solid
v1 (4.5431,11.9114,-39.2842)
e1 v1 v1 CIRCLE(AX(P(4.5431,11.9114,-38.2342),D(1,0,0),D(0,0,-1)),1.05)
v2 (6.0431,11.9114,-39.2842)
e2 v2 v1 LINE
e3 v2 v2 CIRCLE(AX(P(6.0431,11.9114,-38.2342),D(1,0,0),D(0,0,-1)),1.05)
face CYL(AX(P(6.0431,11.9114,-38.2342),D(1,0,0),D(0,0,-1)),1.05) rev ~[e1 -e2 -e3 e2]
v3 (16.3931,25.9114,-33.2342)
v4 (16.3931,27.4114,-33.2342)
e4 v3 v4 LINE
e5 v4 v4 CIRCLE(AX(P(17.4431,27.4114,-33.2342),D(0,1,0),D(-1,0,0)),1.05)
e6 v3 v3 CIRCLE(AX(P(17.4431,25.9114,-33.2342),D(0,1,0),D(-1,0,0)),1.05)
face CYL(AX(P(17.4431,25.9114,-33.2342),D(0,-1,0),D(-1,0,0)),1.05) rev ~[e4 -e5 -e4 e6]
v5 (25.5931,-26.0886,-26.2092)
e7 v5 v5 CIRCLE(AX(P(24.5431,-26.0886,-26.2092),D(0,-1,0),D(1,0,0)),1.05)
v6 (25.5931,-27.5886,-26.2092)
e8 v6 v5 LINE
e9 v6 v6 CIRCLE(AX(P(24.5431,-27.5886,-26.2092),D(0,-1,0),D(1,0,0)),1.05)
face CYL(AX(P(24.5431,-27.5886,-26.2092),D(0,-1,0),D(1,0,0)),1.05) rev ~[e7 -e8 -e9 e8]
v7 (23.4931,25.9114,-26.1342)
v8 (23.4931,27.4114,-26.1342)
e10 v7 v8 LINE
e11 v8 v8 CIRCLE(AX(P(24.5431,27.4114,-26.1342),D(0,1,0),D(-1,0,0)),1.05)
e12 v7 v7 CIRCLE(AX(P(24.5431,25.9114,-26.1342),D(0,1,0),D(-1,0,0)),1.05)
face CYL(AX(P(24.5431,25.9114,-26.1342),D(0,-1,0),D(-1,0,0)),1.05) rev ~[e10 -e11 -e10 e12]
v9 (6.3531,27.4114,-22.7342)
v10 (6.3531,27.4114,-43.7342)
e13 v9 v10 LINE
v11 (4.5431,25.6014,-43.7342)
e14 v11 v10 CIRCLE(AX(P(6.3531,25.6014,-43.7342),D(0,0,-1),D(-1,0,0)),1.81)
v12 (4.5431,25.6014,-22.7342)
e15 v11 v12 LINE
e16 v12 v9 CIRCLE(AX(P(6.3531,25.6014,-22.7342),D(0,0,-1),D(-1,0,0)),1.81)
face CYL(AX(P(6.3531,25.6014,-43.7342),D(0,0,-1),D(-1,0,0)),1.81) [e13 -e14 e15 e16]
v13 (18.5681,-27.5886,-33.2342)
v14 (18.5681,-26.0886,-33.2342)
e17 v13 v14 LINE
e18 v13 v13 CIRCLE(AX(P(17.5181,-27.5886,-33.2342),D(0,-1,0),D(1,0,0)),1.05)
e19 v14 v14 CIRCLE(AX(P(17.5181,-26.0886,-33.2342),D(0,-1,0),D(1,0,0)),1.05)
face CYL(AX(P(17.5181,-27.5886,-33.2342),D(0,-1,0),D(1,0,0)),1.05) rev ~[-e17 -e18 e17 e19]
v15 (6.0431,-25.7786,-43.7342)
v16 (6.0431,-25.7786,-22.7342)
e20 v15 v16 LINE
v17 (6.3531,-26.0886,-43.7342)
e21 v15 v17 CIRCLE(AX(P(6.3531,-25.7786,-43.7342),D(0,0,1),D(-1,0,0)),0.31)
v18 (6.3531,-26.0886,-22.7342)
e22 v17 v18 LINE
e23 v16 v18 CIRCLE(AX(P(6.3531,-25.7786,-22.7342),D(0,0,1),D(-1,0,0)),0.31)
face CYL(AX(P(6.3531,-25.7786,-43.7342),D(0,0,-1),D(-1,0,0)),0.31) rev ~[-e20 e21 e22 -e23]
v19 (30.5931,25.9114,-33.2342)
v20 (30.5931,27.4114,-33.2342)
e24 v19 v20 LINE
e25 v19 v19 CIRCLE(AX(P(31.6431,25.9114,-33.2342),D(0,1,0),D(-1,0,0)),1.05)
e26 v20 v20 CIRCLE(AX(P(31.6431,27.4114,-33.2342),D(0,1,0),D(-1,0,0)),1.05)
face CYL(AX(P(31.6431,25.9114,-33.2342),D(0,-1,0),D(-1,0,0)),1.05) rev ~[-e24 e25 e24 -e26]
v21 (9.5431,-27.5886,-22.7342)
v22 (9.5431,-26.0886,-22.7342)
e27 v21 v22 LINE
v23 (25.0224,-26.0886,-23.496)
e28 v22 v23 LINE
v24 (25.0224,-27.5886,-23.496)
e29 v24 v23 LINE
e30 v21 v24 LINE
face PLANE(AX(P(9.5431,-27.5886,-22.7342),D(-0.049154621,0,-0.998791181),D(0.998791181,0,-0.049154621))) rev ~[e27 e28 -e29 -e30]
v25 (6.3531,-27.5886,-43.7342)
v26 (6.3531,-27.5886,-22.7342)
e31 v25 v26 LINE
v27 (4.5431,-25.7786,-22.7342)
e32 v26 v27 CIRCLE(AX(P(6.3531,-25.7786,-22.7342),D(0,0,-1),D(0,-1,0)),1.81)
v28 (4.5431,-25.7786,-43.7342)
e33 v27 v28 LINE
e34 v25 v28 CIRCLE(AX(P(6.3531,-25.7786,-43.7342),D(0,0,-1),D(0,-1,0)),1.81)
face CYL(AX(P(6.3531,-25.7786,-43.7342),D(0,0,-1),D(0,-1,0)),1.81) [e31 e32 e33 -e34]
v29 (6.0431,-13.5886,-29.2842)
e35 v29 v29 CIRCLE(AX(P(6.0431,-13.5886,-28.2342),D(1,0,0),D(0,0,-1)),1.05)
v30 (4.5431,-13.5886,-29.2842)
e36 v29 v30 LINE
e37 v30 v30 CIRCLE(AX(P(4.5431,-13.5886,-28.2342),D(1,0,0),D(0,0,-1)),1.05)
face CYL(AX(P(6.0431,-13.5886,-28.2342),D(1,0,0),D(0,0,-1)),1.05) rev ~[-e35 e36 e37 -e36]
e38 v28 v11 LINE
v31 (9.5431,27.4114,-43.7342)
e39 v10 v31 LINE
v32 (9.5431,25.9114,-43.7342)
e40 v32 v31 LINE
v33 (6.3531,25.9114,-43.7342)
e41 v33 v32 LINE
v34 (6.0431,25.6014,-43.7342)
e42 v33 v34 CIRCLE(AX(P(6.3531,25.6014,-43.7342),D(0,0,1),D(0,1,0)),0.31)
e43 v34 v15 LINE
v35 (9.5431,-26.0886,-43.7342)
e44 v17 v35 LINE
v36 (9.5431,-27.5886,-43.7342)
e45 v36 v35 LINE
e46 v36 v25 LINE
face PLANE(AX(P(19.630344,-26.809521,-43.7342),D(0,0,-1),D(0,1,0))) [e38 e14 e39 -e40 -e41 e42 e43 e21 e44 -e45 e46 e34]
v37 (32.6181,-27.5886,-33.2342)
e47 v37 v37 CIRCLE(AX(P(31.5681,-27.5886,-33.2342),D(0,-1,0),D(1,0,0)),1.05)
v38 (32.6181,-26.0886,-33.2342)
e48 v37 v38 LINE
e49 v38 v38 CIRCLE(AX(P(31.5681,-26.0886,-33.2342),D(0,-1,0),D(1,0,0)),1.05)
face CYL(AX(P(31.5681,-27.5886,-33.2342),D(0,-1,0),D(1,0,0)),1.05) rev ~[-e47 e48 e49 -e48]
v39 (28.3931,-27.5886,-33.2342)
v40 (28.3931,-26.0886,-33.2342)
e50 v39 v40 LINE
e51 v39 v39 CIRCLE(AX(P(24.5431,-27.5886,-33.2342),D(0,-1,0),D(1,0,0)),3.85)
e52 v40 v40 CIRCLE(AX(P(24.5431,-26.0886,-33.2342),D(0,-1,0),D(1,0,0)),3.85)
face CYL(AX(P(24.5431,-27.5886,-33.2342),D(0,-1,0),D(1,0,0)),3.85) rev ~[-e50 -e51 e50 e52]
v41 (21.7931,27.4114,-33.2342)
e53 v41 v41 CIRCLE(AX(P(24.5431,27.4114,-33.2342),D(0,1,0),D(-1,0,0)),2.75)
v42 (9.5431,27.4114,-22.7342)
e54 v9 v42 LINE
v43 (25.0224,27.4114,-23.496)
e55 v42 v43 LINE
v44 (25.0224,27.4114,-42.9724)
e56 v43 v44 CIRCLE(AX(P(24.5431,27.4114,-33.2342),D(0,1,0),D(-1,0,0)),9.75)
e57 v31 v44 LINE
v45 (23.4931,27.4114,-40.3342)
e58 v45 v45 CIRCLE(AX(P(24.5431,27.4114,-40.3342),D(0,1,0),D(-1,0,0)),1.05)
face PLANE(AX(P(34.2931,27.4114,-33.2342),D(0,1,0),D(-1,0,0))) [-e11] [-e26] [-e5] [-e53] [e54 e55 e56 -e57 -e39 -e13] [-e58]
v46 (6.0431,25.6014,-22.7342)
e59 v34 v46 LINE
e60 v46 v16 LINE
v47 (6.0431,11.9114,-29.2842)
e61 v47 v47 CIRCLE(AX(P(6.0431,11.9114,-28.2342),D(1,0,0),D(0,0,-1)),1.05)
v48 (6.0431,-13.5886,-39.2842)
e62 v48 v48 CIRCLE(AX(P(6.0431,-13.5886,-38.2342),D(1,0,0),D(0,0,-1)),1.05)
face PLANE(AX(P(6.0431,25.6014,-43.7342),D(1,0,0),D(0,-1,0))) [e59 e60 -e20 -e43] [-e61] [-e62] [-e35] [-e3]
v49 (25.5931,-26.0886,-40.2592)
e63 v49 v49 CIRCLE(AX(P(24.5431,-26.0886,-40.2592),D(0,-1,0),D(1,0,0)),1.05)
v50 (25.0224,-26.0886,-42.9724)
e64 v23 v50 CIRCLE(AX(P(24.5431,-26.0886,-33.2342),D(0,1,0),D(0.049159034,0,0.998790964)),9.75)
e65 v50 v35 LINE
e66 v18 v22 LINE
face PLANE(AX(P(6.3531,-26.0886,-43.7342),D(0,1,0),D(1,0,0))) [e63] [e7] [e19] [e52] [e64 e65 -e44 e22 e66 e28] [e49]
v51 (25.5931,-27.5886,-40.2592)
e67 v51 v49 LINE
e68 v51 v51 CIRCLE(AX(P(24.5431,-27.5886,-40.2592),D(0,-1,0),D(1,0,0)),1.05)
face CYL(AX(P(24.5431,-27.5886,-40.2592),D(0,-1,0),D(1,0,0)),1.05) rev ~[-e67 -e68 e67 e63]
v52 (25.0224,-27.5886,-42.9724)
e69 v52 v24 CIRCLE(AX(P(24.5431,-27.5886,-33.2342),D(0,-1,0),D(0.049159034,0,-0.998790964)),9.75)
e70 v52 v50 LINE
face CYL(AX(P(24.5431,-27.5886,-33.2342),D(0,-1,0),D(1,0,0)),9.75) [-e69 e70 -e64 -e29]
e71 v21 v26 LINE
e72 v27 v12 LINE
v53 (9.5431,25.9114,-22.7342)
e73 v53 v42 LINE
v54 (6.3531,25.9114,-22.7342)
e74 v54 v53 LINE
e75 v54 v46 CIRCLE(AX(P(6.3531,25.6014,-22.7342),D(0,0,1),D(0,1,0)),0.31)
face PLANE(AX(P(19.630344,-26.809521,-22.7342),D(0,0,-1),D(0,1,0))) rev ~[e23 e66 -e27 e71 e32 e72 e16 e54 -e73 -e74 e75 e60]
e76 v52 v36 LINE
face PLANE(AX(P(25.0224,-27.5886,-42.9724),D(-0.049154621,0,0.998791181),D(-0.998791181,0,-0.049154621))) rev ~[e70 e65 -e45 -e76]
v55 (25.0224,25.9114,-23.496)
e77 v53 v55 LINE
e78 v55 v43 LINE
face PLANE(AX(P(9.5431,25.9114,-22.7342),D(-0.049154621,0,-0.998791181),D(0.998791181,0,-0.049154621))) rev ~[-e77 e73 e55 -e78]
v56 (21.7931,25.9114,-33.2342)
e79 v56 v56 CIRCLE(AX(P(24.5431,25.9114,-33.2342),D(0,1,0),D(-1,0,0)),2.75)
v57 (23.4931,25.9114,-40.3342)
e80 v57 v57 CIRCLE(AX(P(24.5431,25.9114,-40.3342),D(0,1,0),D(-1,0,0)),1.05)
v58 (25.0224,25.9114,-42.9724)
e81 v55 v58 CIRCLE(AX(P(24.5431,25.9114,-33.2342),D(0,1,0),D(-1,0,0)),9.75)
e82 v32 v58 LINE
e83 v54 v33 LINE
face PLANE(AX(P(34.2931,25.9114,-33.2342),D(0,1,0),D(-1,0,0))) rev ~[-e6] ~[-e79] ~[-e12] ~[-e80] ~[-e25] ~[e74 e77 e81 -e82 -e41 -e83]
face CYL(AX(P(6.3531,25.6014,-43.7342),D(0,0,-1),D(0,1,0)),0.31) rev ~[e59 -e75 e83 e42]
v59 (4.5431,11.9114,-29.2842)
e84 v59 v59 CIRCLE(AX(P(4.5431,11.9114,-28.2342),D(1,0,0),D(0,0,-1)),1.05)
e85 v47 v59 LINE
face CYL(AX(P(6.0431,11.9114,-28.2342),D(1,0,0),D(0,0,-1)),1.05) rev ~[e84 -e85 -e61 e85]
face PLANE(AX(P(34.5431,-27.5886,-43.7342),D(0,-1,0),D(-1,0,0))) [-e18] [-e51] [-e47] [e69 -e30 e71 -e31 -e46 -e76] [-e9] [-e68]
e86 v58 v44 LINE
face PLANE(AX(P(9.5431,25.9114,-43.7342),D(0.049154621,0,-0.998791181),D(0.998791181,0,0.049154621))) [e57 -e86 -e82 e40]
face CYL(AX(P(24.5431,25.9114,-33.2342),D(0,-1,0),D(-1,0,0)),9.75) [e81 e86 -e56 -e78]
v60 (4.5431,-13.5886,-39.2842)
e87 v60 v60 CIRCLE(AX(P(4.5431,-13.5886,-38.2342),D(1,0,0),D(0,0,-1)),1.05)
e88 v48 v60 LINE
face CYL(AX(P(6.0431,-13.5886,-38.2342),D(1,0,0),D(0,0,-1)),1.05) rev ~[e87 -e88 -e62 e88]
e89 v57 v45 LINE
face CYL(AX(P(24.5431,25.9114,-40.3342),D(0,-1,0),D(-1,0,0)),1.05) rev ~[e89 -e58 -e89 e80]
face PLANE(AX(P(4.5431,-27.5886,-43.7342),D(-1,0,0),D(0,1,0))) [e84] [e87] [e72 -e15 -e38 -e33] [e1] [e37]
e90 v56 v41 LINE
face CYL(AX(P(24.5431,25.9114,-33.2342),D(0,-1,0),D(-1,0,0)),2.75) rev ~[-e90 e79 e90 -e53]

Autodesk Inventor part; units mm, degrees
ref_plane "YZ Plane" through (0, 0, 0) normal (1, 0, 0) x (0, 1, 0)
ref_plane "Work Plane1" through (34.2931, 25.9114, -33.2342) normal (0, 1, 0) x (-1, 0, 0)
sketch "Sketch2" plane through (34.2931, 25.9114, -33.2342) normal (0, 1, 0) x (-1, 0, 0)
  circle A0 centre (9.75, 7.1) radius 0.7835
  circle A1 centre (16.85, 0) radius 0.7835
  circle A2 centre (9.75, -7.1) radius 0.7835
  circle A3 centre (2.65, 0) radius 0.7835
  circle A4 centre (4.7295, -5.0205) radius 0.7835
  circle A5 centre (14.7705, -5.0205) radius 0.7835
  circle A6 centre (14.7705, 5.0205) radius 0.7835
  circle A7 centre (4.7295, 5.0205) radius 0.7835
  circle A8 centre (9.75, 0) radius 3.8
  circle A9 centre (9.75, 0) radius 9.75
  circle A10 centre (9.75, 0) radius 2.75
  line L0 (29.75, -10.5) -> (29.75, 10.5)
  line L1 (29.75, -10.5) -> (24.75, -10.5)
  line L2 (29.75, 10.5) -> (24.75, 10.5)
  line L3 (24.75, -10.5) -> (9.2707, -9.7382)
  line L4 (24.75, 10.5) -> (9.2707, 9.7382)
  circle A11 centre (9.75, -7.1) radius 1.05
  circle A12 centre (16.85, 0) radius 1.05
  circle A13 centre (9.75, 7.1) radius 1.05
  circle A14 centre (2.65, 0) radius 1.05
  point P0 (34.2931, 33.2342)
  point P1 (29.75, 0)
  dimension "d2" = 5.5
  dimension "d4" = 21
  dimension "d5" = 5
  dimension "d6" = 20
  dimension "d36" = 2.1
extrude "Plate2" add sketch "Sketch2" along normal blind 1.5 contours A4 | A5 | A6 | A7 | A8 | A9 | A9 L4 L2 L0 L1 L3
sketch "Sketch3" plane through (6.0431, 27.4114, -43.7342) normal (-1, 0, 0) x (0, -1, 0)
  line L0 (0, 21) -> (0, 0)
  line L1 (0, 0) -> (55, 0)
  line L2 (55, 0) -> (55, 21)
  line L3 (55, 21) -> (0, 21)
edge flange "Flange1" height 55 angle 90 thickness 1.5 bend radius 0.31 thickness toward (-1, 0, 0) relief tear relief width 1.5 relief depth 0.75 edges at (4.5431, 25.9114, -33.2342) wall of the first edge with corners at (6.0431, 27.4114, -22.7342) (6.0431, 27.4114, -43.7342) (6.0431, -27.5886, -43.7342) (6.0431, -27.5886, -22.7342)
bend "Bend1"
corner "Corner1"
sketch "Sketch4" plane through (4.5431, -26.0886, -43.7342) normal (0, -1, 0) x (1, 0, 0)
  line L0 (0, 21) -> (0, 0)
  line L1 (0, 0) -> (30, 0)
  line L2 (30, 0) -> (30, 21)
  line L3 (30, 21) -> (0, 21)
edge flange "Flange2" height 30 angle 90 thickness 1.5 bend radius 0.31 thickness toward (0, -1, 0) relief tear relief width 1.5 relief depth 0.75 edges at (6.0431, -27.5886, -33.2342) wall of the first edge with corners at (4.5431, -26.0886, -22.7342) (4.5431, -26.0886, -43.7342) (34.5431, -26.0886, -43.7342) (34.5431, -26.0886, -22.7342)
bend "Bend2"
corner "Corner2"
sketch "Sketch5" plane through (34.5431, -27.5886, -43.7342) normal (0, -1, 0) x (1, 0, 0)
  circle A0 centre (-10, 10.5) radius 3.8 projected
  circle A1 centre (-10, 10.5) radius 3.85
  point P0 (-34.5431, 43.7342)
  dimension "d37" = 7.7
extrude "Cut1" cut sketch "Sketch5" against normal blind 1.5 contours A0 | A1
sketch "Sketch6" plane through (34.5431, -27.5886, -43.7342) normal (0, -1, 0) x (1, 0, 0)
  circle A0 centre (-10, 17.525) radius 0.7835 projected
  circle A1 centre (-2.975, 10.5) radius 0.7835 projected
  circle A2 centre (-10, 3.475) radius 0.7835 projected
  circle A3 centre (-17.025, 10.5) radius 0.7835 projected
  circle A4 centre (-10, 10.5) radius 9.75 projected
  line L0 (-25, 21) -> (-9.5207, 20.2382) projected
  line L1 (-9.5207, 0.7618) -> (-25, 0) projected
  line L2 (-28.19, 21) -> (0, 21) projected
  line L3 (0, 21) -> (0, 0) projected
  line L4 (0, 0) -> (-28.19, 0) projected
  line L5 (-28.19, 21) -> (-30, 21) projected
  line L6 (-30, 0) -> (-28.19, 0) projected
  circle A5 centre (-2.975, 10.5) radius 1.05
  circle A6 centre (-10, 17.525) radius 1.05
  circle A7 centre (-17.025, 10.5) radius 1.05
  circle A8 centre (-10, 3.475) radius 1.05
  point P0 (-34.5431, 43.7342)
  dimension "d35" = 2.1
extrude "Cut2" cut sketch "Sketch6" against normal blind 1.5 contours A0 | A1 | A2 | A3 | A4 L0 L2 L3 L4 L1 | A5 | A6 | A7 | A8
ref_plane "작업 평면2" through (4.5431, 25.6014, -33.2342) normal (0, 0, 1) x (1, 0, 0)
sketch "Sketch7" plane through (6.0431, 25.6014, -22.7342) normal (1, 0, 0) x (0, 0, -1)
  circle A0 centre (5.5, -13.69) radius 0.7835 projected
  circle A1 centre (15.5, -13.69) radius 0.7835 projected
  circle A2 centre (5.5, -39.19) radius 0.7835 projected
  circle A3 centre (15.5, -39.19) radius 0.7835 projected
  circle A4 centre (5.5, -13.69) radius 1.05
  circle A5 centre (15.5, -13.69) radius 1.05
  circle A6 centre (5.5, -39.19) radius 1.05
  circle A7 centre (15.5, -39.19) radius 1.05
  point P0 (-22.7342, -25.6014)
  dimension "d34" = 2.1
extrude "Cut3" cut sketch "Sketch7" against normal blind 1.5 contours A0 | A1 | A2 | A3 | A4 | A5 | A6 | A7
equation "\"d28\" = Thickness"
equation "\"d30\" = Thickness"
equation "\"d32\" = Thickness"
equation "\"d7\" = Thickness"
equation "\"d8\" = BendReliefWidth"
equation "\"d9\" = BendReliefDepth"
equation "\"d10\" = MinimumRemnant"
equation "\"d11\" = TransitionRadius"
equation "\"d14\" = BendRadius"
equation "\"d15\" = CornerReliefSize"
equation "\"d16\" = GapSize"
equation "\"d17\" = JacobiRadiusSize"
equation "\"d18\" = BendReliefWidth"
equation "\"d19\" = BendReliefDepth"
equation "\"d20\" = MinimumRemnant"
equation "\"d21\" = TransitionRadius"
equation "\"d24\" = BendRadius"
equation "\"d25\" = CornerReliefSize"
equation "\"d26\" = GapSize"
equation "\"d27\" = JacobiRadiusSize"
equation "\"BendReliefWidth\" = Thickness"
equation "\"BendReliefDepth\" = 0.5 * Thickness"
equation "\"CornerReliefSize\" = 4 * Thickness"
equation "\"MinimumRemnant\" = 2 * Thickness"
equation "\"TransitionRadius\" = BendRadius"
equation "\"JacobiRadiusSize\" = BendRadius"
equation "\"GapSize\" = Thickness"
equation "\"Thickness\" = 1.5"
equation "\"BendRadius\" = 0.31"
properties part number "ㄷ_frame_2" material "Aluminum 6061"
